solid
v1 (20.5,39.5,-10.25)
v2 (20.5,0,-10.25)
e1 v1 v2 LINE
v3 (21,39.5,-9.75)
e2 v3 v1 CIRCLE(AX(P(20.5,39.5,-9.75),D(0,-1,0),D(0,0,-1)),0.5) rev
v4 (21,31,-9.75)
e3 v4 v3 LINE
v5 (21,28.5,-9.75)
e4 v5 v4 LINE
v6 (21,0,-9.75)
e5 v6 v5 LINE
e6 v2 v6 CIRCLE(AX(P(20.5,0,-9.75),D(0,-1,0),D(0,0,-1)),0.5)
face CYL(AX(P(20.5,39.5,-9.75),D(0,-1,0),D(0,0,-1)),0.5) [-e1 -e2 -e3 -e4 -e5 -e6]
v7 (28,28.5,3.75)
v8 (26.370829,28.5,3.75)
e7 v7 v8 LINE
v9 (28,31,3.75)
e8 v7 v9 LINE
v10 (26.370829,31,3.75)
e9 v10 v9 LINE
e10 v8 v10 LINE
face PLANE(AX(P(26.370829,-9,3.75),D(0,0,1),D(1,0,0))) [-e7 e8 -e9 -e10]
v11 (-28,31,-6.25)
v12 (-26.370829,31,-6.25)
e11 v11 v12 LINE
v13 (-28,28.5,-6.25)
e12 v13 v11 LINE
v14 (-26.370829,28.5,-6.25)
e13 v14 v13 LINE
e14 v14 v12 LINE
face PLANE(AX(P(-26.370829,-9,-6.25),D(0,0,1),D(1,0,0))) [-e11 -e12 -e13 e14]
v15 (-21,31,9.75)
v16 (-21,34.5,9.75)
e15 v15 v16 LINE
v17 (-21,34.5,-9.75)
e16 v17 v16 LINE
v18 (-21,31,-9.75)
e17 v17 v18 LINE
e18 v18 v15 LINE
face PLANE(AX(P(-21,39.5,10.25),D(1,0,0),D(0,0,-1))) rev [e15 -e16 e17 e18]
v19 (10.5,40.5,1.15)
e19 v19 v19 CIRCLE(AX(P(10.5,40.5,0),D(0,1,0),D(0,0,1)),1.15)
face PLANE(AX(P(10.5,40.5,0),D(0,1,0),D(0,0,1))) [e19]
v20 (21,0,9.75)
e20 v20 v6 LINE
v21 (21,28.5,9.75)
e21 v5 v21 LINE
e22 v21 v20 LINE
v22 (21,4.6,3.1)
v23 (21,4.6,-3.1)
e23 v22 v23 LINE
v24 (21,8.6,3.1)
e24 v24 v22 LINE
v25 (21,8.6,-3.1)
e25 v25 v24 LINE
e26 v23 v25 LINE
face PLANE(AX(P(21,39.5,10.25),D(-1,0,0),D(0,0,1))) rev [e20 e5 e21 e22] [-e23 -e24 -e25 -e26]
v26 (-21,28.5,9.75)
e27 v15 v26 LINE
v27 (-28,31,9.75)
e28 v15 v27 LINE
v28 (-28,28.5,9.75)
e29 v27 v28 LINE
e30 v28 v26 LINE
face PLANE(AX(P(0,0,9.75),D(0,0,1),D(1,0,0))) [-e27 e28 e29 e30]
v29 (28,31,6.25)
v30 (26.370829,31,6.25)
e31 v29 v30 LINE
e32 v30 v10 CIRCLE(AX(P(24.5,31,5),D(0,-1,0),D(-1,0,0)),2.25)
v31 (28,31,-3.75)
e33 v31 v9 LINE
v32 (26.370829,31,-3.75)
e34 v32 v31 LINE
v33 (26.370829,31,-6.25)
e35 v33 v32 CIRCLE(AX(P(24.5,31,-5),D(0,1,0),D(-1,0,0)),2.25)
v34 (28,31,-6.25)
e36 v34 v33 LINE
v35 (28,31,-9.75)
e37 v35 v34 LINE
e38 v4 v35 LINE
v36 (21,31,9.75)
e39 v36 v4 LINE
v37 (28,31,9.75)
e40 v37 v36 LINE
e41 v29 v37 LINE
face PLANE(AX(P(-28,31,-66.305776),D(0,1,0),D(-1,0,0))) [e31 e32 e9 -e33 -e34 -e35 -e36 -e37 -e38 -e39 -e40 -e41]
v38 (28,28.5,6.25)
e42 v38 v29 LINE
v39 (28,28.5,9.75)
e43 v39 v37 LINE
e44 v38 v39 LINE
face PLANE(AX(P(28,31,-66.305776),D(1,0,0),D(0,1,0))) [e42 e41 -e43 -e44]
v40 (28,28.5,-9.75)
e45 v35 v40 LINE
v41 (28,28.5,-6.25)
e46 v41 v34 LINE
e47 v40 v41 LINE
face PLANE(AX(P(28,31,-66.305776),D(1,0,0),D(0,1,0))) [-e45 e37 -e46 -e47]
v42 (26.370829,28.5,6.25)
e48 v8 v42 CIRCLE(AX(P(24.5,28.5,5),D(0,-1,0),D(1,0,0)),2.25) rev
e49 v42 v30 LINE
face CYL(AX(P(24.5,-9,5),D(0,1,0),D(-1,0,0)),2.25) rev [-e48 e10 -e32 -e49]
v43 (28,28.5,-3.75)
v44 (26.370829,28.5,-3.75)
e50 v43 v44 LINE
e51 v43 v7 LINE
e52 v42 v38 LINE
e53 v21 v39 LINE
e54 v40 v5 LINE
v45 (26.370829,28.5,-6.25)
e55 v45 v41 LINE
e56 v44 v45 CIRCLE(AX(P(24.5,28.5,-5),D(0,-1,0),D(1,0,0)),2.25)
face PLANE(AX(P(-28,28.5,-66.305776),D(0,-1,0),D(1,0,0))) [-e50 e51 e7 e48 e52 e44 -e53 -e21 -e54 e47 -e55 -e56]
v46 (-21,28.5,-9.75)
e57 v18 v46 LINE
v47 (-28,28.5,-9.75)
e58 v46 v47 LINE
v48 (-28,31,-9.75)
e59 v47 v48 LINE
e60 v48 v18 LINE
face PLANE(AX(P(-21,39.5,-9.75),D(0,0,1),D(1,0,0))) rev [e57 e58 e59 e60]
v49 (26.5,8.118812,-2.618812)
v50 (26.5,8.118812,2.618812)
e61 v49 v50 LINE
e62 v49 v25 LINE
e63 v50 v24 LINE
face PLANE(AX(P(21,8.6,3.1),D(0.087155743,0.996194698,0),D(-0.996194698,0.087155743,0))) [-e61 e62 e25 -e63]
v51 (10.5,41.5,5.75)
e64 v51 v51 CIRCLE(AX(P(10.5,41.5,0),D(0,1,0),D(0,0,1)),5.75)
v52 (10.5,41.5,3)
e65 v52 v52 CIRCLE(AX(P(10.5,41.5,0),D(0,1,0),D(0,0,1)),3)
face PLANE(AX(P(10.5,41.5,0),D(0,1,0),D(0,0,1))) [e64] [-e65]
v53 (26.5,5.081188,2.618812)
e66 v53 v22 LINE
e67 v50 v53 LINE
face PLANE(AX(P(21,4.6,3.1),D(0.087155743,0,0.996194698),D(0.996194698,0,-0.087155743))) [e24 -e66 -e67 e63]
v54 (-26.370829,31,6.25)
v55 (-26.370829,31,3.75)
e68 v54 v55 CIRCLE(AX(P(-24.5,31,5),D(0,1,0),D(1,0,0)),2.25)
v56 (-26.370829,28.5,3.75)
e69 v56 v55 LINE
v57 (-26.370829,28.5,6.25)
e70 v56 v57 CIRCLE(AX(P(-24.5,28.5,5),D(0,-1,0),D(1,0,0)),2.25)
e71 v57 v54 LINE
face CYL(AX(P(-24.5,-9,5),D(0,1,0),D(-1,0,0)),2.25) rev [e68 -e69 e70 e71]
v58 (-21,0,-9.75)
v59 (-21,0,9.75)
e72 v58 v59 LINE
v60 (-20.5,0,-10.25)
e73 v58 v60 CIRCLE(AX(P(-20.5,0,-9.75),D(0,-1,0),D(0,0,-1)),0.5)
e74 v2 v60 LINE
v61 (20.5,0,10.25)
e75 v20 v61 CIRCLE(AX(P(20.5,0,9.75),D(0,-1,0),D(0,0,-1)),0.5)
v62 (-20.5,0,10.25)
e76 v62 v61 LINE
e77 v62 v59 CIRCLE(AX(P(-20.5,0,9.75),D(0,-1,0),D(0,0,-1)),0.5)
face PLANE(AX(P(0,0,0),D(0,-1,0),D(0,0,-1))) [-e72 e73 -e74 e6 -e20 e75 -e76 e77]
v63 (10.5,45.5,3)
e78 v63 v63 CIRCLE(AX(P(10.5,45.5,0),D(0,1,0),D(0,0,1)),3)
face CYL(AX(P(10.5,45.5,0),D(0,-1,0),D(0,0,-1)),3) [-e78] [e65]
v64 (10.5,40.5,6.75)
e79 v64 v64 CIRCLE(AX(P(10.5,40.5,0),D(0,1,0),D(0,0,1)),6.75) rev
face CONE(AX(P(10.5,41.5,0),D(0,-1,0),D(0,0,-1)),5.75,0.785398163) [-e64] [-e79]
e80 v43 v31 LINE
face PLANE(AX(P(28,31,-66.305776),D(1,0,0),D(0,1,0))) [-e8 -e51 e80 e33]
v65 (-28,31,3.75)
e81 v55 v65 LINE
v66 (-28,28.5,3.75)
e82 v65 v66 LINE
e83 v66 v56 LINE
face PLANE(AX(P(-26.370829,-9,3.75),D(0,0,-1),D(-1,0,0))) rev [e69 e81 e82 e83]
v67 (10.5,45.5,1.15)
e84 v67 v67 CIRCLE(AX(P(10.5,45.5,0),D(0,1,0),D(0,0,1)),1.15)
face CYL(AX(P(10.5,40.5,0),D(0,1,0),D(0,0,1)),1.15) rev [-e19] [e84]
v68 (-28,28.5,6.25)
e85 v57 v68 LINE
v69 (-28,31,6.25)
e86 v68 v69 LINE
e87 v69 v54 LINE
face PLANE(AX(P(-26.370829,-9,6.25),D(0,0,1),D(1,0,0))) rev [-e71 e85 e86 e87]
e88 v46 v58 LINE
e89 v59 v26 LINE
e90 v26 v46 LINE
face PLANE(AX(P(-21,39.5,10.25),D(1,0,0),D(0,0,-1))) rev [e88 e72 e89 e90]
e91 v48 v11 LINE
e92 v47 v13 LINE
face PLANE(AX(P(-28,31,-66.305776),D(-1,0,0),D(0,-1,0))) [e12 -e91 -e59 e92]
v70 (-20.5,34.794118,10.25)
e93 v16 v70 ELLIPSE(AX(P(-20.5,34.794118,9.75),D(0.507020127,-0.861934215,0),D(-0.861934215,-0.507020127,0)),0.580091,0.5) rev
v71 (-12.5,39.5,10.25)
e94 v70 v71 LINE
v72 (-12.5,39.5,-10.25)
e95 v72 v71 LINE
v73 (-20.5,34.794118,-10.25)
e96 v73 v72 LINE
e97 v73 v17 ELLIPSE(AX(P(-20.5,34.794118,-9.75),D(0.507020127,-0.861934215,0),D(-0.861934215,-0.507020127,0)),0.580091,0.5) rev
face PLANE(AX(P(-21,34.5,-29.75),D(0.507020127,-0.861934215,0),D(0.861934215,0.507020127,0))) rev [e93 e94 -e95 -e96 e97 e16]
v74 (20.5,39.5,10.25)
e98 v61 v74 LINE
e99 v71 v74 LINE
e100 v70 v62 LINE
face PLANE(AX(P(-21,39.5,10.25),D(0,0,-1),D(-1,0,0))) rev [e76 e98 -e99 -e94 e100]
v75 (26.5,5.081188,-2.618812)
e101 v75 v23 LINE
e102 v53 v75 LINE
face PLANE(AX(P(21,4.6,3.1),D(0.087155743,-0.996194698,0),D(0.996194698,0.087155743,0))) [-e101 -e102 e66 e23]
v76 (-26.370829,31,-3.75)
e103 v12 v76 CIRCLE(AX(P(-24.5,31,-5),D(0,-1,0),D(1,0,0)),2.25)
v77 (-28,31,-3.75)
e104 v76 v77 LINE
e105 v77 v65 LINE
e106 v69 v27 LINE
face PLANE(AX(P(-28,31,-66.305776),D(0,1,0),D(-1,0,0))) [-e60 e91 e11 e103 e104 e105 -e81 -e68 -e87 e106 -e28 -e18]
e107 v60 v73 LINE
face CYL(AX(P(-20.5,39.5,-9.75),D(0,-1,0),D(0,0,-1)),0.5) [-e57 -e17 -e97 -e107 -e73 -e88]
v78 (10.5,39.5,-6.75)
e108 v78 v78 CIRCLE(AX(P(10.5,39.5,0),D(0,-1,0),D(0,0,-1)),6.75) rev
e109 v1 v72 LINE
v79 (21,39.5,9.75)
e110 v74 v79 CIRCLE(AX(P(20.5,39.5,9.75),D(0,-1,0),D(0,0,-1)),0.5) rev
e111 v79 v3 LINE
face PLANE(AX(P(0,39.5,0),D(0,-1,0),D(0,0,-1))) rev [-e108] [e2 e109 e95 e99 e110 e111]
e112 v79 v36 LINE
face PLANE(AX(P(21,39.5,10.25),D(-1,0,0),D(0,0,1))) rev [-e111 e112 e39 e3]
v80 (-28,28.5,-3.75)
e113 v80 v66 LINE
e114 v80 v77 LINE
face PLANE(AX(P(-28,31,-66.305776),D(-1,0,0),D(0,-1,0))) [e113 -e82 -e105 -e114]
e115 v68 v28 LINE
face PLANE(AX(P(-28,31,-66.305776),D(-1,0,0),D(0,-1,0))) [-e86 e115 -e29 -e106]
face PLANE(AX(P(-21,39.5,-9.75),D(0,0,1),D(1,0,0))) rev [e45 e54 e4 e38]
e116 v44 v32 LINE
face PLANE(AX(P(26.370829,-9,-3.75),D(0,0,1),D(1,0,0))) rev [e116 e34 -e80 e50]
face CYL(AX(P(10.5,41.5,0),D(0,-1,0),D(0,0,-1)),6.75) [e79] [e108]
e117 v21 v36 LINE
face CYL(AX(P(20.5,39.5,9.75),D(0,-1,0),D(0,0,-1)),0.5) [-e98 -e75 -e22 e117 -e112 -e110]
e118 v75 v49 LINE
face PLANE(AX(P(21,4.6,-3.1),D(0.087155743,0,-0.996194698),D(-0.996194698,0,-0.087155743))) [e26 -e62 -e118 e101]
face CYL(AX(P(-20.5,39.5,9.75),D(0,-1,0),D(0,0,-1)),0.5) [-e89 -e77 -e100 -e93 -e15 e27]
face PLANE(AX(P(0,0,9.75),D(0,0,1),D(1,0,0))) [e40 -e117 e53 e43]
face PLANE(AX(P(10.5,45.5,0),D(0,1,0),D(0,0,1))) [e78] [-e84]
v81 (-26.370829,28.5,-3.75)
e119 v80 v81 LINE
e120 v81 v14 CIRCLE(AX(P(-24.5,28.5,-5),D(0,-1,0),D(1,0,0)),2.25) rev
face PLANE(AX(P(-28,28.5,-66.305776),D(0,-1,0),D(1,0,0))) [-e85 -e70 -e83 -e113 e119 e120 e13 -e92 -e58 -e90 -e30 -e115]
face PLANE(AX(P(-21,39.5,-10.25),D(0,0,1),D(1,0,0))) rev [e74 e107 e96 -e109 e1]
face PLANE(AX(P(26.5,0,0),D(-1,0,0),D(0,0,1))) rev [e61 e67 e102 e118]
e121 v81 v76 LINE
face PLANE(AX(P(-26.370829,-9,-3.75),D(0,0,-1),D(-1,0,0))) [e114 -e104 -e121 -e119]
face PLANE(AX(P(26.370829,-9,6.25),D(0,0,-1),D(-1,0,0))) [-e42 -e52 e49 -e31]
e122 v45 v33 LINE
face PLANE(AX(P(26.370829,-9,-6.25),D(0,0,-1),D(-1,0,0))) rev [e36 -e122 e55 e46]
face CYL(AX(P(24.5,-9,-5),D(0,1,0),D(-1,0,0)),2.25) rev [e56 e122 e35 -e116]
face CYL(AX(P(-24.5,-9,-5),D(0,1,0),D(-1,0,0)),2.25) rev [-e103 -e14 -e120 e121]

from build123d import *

# Parameters (mm, degrees)
SKETCH1_W            = 42
SKETCH1_H            = 20.5
BOSS_EXTRUDE1_DEPTH  = 39.5
BOSS_EXTRUDE2_START  = -0.5
SKETCH2_W            = 56
SKETCH2_H            = 2.5
BOSS_EXTRUDE2_DEPTH  = 19.5
CUT_EXTRUDE1_DEPTH   = 40
MIRROR2_COPY_1_DEPTH = 40
CUT_EXTRUDE2_DEPTH   = 40
SKETCH5_R            = 3
BOSS_EXTRUDE3_DEPTH  = 6
SKETCH6_R            = 6.75
BOSS_EXTRUDE4_DEPTH  = 2
SKETCH7_R            = 1.15
CUT_EXTRUDE3_DEPTH   = 5
FILLET1_R            = 0.5
SKETCH8_W            = 6.2
SKETCH8_H            = 4
BOSS_EXTRUDE5_DEPTH  = 5.5
BOSS_EXTRUDE5_TAPER  = 5
CHAMFER1_SIZE        = 1


with BuildPart() as part:
    # Sketch1 → Boss-Extrude1 (new body)
    with BuildSketch(Plane(origin=(0, 0, 0), x_dir=(1, 0, 0), z_dir=(0, 1, 0))):
        Rectangle(SKETCH1_W, SKETCH1_H)
    extrude(amount=BOSS_EXTRUDE1_DEPTH)

    # Sketch2 → Boss-Extrude2 (add)
    with BuildSketch(Plane.XY.offset(10.25).offset(BOSS_EXTRUDE2_START)):
        with Locations((0, 29.75)):
            Rectangle(SKETCH2_W, SKETCH2_H)
    extrude(amount=-BOSS_EXTRUDE2_DEPTH)

    # Sketch3 → Cut-Extrude1 (cut)
    with BuildSketch(Plane(origin=(0, 31, 0), x_dir=(1, 0, 0), z_dir=(0, 1, 0))):
        with BuildLine():
            Line((26.370828693, 3.75), (28, 3.75))
            Line((28, 3.75), (28, 6.25))
            Line((28, 6.25), (26.370828693, 6.25))
            ThreePointArc((26.370828693, 6.25), (22.25, 5), (26.370828693, 3.75))
        make_face()
    cut_extrude1 = extrude(amount=-CUT_EXTRUDE1_DEPTH, mode=Mode.SUBTRACT)

    # Mirror1: Cut-Extrude1 across plane
    add(cut_extrude1.mirror(Plane.XY), mode=Mode.SUBTRACT)

    # Mirror2: Cut-Extrude1 across plane
    add(cut_extrude1.mirror(Plane(origin=(0, 0, 0), x_dir=(0, 0, 1), z_dir=(1, 0, 0))), mode=Mode.SUBTRACT)

    # Mirror2 copy 1 sketch → Mirror2 copy 1 (cut)
    with BuildSketch(Plane(origin=(0, 31, 0), x_dir=(-1, 0, 0), z_dir=(0, 1, 0))):
        with BuildLine():
            Line((26.370828693, 3.75), (28, 3.75))
            Line((28, 3.75), (28, 6.25))
            Line((28, 6.25), (26.370828693, 6.25))
            ThreePointArc((26.370828693, 6.25), (22.25, 5), (26.370828693, 3.75))
        make_face()
    extrude(amount=-MIRROR2_COPY_1_DEPTH, mode=Mode.SUBTRACT)

    # Sketch4 → Cut-Extrude2 (cut)
    with BuildSketch(Plane.XY.offset(10.25)):
        Polygon((-21, 34.5), (-12.5, 39.5), (-12.5, 42.326326537), (-24.476884638, 42.326326537), (-24.476884638, 34.5), align=None)
    extrude(amount=-CUT_EXTRUDE2_DEPTH, mode=Mode.SUBTRACT)

    # Sketch5 → Boss-Extrude3 (add)
    with BuildSketch(Plane(origin=(0, 39.5, 0), x_dir=(1, 0, 0), z_dir=(0, 1, 0))):
        with Locations(Location((10.5, 0, 0), (0, 0, 90))):
            Circle(SKETCH5_R)
    extrude(amount=BOSS_EXTRUDE3_DEPTH)

    # Sketch6 → Boss-Extrude4 (add)
    with BuildSketch(Plane(origin=(0, 39.5, 0), x_dir=(1, 0, 0), z_dir=(0, 1, 0))):
        with Locations(Location((10.5, 0, 0), (0, 0, 90))):
            Circle(SKETCH6_R)
    extrude(amount=BOSS_EXTRUDE4_DEPTH)

    # Sketch7 → Cut-Extrude3 (cut)
    with BuildSketch(Plane(origin=(0, 45.5, 0), x_dir=(1, 0, 0), z_dir=(0, 1, 0))):
        with Locations(Location((10.5, 0, 0), (0, 0, 270))):
            Circle(SKETCH7_R)
    extrude(amount=-CUT_EXTRUDE3_DEPTH, mode=Mode.SUBTRACT)

    # Fillet1
    fillet1_edges = [part.edges().sort_by_distance(p)[0] for p in [
        (-21, 17.25, -10.25),
        (-21, 17.25, 10.25),
        (21, 19.75, -10.25),
        (21, 19.75, 10.25),
    ]]
    fillet(fillet1_edges, radius=FILLET1_R - 0.0001)  # a hair under: the kernel refuses the full size

    # Sketch8 → Boss-Extrude5 (add)
    with BuildSketch(Plane(origin=(21, 0, 0), x_dir=(0, 0, -1), z_dir=(1, 0, 0))):
        with Locations((0, 6.6)):
            Rectangle(SKETCH8_W, SKETCH8_H)
    extrude(amount=BOSS_EXTRUDE5_DEPTH, taper=BOSS_EXTRUDE5_TAPER)

    # Chamfer1
    chamfer1_edges = [part.edges().sort_by_distance(p)[0] for p in [
        (10.5, 41.5, 6.75),
    ]]
    chamfer(chamfer1_edges, length=CHAMFER1_SIZE)


solid = part.part
